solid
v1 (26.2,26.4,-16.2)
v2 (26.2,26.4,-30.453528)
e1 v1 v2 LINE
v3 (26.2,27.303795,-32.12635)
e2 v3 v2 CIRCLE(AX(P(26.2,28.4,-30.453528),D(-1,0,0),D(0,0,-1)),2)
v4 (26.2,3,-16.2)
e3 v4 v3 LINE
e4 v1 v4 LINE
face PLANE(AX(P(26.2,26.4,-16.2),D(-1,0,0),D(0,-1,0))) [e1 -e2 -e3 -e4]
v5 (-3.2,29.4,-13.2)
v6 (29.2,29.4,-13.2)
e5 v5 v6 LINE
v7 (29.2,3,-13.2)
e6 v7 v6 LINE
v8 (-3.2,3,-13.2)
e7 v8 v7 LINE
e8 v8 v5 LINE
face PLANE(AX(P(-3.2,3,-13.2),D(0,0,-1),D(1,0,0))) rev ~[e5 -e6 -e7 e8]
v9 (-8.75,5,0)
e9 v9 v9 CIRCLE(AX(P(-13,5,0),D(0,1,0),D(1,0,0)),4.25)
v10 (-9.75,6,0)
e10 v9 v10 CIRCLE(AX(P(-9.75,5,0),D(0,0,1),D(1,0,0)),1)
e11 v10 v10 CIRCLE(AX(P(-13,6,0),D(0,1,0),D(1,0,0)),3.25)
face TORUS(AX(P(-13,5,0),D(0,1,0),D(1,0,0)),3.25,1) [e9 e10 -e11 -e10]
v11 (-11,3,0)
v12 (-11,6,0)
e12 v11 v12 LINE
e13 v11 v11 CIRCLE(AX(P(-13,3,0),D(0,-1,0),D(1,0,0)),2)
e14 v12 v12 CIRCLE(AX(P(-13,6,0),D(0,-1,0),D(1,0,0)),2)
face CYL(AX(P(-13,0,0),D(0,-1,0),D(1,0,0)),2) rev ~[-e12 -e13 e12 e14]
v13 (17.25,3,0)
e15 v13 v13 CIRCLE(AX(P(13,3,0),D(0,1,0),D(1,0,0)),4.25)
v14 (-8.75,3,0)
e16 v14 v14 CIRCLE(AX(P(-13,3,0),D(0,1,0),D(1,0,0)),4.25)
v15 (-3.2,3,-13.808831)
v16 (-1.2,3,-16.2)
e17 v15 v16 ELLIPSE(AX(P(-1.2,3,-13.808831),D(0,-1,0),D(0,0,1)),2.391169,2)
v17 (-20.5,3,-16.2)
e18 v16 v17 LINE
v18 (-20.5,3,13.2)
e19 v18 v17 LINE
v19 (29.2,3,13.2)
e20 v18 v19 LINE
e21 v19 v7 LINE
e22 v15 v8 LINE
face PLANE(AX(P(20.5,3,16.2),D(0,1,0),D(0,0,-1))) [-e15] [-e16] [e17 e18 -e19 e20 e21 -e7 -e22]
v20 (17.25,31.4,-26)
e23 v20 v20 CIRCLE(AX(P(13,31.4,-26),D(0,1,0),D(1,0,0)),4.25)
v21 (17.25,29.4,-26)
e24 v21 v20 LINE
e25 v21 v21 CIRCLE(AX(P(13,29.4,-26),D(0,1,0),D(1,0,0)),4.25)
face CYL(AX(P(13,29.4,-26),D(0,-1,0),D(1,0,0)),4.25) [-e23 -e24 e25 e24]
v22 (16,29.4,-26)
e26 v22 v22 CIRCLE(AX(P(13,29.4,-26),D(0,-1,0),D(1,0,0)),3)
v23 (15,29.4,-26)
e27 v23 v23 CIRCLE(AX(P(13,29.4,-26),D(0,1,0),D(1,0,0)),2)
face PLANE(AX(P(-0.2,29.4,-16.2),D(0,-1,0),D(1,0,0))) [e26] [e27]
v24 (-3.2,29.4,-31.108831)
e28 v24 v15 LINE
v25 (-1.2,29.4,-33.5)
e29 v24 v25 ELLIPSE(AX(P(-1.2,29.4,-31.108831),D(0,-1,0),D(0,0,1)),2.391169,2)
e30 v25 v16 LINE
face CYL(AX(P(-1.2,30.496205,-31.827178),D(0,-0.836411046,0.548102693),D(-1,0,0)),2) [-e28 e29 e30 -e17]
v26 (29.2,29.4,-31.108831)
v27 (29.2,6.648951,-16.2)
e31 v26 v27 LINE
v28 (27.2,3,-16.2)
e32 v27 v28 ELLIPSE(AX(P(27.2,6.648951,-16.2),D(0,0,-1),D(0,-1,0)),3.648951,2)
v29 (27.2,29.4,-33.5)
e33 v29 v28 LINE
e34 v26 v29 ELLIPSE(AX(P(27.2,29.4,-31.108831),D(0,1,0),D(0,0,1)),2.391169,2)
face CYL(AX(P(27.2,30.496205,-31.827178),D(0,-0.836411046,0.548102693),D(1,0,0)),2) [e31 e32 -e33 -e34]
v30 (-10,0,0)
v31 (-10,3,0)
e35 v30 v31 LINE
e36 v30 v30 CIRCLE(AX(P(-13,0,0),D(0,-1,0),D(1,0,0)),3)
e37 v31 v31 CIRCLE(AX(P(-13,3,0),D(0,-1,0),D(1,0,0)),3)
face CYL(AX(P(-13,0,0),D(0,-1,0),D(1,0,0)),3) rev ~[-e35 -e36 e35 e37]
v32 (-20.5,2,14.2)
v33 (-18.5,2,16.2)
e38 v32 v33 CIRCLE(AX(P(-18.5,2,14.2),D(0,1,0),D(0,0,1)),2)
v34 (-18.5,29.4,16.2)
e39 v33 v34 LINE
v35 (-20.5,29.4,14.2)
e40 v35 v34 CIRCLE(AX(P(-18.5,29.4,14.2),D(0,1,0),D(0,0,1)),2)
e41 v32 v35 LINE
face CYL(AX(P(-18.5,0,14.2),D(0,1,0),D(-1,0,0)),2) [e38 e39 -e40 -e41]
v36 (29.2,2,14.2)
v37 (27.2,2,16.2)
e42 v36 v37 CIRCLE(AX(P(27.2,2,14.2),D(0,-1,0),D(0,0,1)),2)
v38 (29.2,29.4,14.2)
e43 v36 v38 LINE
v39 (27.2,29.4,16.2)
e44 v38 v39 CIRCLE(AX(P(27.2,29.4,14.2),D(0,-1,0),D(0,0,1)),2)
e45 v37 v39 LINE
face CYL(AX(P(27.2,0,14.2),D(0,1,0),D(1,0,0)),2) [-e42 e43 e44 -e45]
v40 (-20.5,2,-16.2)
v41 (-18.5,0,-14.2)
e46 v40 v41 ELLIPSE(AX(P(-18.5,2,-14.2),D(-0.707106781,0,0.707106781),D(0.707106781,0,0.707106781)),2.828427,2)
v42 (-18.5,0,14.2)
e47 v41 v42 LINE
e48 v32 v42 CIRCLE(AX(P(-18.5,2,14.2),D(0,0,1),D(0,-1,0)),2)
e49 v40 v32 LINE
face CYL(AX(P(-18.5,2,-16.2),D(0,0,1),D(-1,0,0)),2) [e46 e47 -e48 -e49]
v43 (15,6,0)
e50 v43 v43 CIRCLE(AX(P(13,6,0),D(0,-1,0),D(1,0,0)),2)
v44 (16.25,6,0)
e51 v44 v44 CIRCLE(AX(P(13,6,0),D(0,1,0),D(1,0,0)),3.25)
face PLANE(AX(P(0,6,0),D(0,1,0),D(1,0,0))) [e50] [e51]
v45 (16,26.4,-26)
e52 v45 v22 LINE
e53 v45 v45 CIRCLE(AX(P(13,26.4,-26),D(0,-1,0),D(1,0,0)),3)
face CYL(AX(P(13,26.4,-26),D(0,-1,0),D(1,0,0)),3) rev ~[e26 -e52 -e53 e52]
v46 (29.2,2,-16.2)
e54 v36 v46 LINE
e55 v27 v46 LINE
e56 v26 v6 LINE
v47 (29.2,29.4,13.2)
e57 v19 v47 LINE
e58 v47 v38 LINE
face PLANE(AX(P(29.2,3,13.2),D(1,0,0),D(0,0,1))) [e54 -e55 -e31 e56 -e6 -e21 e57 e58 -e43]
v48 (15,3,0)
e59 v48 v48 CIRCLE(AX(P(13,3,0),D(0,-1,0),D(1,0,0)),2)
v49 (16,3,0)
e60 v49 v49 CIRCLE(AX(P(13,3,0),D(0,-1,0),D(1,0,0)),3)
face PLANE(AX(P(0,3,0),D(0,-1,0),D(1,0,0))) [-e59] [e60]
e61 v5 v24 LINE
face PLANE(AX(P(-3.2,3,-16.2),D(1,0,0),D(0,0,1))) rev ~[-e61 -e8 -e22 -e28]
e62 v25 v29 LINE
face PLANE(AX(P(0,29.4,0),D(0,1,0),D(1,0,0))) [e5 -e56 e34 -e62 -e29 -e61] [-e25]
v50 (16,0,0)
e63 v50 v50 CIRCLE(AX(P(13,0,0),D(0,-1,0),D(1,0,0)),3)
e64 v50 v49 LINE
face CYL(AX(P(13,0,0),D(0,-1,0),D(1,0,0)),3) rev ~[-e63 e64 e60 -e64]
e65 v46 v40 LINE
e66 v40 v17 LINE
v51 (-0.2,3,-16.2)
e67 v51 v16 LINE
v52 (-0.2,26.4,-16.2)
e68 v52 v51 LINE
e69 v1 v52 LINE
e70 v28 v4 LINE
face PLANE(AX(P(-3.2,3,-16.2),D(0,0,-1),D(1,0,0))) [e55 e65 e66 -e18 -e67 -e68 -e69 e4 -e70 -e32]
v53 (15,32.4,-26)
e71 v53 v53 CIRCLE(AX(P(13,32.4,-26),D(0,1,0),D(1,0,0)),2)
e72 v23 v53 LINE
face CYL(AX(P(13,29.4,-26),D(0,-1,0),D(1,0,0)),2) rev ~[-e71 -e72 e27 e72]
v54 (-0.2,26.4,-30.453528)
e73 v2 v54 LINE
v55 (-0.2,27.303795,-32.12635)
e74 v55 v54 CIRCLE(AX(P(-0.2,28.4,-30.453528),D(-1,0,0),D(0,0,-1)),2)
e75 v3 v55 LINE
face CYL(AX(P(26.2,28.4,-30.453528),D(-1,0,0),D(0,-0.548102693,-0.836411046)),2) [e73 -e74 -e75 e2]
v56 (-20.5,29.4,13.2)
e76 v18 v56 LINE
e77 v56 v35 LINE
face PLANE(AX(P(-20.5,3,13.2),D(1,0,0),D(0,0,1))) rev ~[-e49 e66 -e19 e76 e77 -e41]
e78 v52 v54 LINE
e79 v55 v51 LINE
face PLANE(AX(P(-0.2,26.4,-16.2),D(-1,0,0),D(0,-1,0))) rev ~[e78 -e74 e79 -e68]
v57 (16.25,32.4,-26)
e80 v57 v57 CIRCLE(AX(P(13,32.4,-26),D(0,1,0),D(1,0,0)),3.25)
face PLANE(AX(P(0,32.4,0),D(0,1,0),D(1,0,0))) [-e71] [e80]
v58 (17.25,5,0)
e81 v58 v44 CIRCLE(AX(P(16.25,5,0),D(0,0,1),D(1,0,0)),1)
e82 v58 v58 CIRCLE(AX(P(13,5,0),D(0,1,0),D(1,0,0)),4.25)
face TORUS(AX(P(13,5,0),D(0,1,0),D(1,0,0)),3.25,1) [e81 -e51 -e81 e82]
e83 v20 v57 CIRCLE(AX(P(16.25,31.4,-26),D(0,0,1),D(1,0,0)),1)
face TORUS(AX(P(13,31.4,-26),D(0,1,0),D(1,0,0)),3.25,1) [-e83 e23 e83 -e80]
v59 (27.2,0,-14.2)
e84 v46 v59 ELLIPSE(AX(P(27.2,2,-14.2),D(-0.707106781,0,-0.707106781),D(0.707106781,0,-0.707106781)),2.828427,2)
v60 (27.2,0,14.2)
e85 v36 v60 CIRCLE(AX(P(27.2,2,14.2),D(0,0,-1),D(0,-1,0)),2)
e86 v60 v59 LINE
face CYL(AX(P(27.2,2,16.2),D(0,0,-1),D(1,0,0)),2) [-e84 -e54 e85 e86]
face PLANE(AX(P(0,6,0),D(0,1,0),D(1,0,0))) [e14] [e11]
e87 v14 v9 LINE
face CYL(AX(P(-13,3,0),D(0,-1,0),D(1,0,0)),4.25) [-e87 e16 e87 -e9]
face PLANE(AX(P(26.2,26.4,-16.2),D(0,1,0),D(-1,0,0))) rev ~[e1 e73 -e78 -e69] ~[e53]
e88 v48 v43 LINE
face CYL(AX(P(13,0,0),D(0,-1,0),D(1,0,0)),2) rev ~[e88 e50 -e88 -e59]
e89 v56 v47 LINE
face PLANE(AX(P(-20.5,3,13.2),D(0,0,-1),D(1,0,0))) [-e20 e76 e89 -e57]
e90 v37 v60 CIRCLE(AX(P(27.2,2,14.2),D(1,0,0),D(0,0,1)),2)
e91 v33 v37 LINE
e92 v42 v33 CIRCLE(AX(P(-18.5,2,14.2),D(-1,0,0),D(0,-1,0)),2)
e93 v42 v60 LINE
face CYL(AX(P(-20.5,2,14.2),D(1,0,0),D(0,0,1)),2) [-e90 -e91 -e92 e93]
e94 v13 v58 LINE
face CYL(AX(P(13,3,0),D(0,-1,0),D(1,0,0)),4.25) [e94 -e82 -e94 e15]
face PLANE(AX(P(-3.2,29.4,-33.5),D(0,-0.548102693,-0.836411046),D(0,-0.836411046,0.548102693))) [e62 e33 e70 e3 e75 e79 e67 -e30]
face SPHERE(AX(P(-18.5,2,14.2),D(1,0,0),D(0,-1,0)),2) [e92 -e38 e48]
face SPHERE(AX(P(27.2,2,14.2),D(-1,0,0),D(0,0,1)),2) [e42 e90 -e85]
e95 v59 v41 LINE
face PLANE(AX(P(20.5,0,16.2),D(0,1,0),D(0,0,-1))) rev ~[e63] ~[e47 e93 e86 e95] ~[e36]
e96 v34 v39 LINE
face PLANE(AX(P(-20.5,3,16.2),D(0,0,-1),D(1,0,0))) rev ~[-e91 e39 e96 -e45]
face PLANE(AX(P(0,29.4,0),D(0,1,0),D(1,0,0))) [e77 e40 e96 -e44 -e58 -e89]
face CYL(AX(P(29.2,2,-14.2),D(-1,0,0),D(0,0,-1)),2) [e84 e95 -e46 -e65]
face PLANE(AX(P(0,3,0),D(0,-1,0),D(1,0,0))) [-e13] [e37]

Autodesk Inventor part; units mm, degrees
ref_plane "YZ Plane" through (0, 0, 0) normal (1, 0, 0) x (0, 1, 0)
ref_plane "XZ Plane" through (0, 0, 0) normal (0, 1, 0) x (-1, 0, 0)
ref_plane "XY Plane" through (0, 0, 0) normal (0, 0, 1) x (1, 0, 0)
sketch "Sketch1" plane through (0, 0, 0) normal (0, 1, 0) x (-1, 0, 0)
  line L0 (20.5, 16.2) -> (-20.5, 16.2)
  line L1 (-20.5, 16.2) -> (-20.5, -16.2)
  line L2 (-20.5, -16.2) -> (20.5, -16.2)
  line L3 (20.5, -16.2) -> (20.5, 16.2)
  point P0 (0, 0)
  dimension "d0" = 41
  dimension "d1" = 32.4
extrude "Extrusion1" add sketch "Sketch1" along normal blind 3
sketch "Sketch4" plane through (20.5, 0, -16.2) normal (0, 0, -1) x (-1, 0, 0)
  line L0 (41, 3) -> (0, 3) projected
  line L1 (0, 28.4) -> (41, 28.4) projected
  line L2 (0, 3) -> (21.5, 3)
  line L3 (21.5, 3) -> (21.5, 28.4)
  line L4 (21.5, 28.4) -> (0, 28.4)
  line L5 (0, 28.4) -> (0, 3)
  point P0 (20.5, 0)
  dimension "d12" = 21.5
extrude "Extrusion4" cut sketch "Sketch4" against normal blind 3
sketch "Sketch5" plane through (-20.5, 0, 16.2) normal (0, 0, 1) x (1, 0, 0)
  line L0 (41, 28.4) -> (0, 28.4) projected
  line L1 (41, 3) -> (0, 3) projected
  line L2 (0, 28.4) -> (21.5, 28.4)
  line L3 (21.5, 28.4) -> (21.5, 3)
  line L4 (21.5, 3) -> (0, 3)
  line L5 (0, 3) -> (0, 28.4)
  point P0 (20.5, 0)
  point P1 (19.5, 3)
  point P2 (19.5, 3)
  dimension "d15" = 21.5
extrude "Extrusion5" cut sketch "Sketch5" against normal blind 3
sketch "Sketch6" plane through (0, 3, 0) normal (0, 1, 0) x (1, 0, 0)
  circle A0 centre (13, 0) radius 4.25
  circle A1 centre (-13, 0) radius 4.25
  point P0 (0, 0)
  dimension "d20" = 8.5
  dimension "d21" = 8.5
extrude "Extrusion6" add sketch "Sketch6" along normal blind 3
sketch "Sketch7" plane through (0, 0, 0) normal (0, -1, 0) x (1, 0, 0)
  circle A0 centre (-13, 0) radius 4.25 projected
  circle A1 centre (-13, 0) radius 2
  circle A2 centre (13, 0) radius 4.25 projected
  circle A3 centre (13, 0) radius 2
  point P0 (0, 0)
  dimension "d24" = 4
  dimension "d25" = 4
extrude "Extrusion7" cut sketch "Sketch7" against normal blind 6 contours A1 | A3
sketch "Sketch8" plane through (0, 0, 0) normal (0, -1, 0) x (1, 0, 0)
  circle A0 centre (-13, 0) radius 2 projected
  circle A1 centre (-13, 0) radius 3
  circle A2 centre (13, 0) radius 2 projected
  circle A3 centre (13, 0) radius 3
  point P0 (0, 0)
  dimension "d28" = 6
  dimension "d29" = 6
extrude "Extrusion8" cut sketch "Sketch8" against normal blind 3 contours A0 | A1 | A2 | A3
sketch "Sketch15" plane through (20.5, 0, 16.2) normal (1, 0, 0) x (0, 0, -1)
  line L0 (0, 3) -> (32.4, 3) projected
  line L1 (0, 0) -> (32.4, 0)
  line L2 (32.4, 0) -> (32.4, 3)
  line L3 (32.4, 3) -> (0, 3)
  line L4 (0, 3) -> (0, 0)
  point P0 (16.2, 0)
extrude "Extrusion15" add sketch "Sketch15" along normal blind 8.7
sketch "Sketch23" plane through (0, 3, 0) normal (0, 1, 0) x (1, 0, 0)
  line L0 (-20.5, 16.2) -> (29.2, 16.2) projected
  line L1 (29.2, 16.2) -> (-3.2, 16.2)
  line L2 (-3.2, 16.2) -> (-3.2, 13.2)
  line L3 (-3.2, 13.2) -> (29.2, 13.2)
  line L4 (29.2, 13.2) -> (29.2, 16.2)
  point P0 (0, 0)
  dimension "d81" = 32.4
  dimension "d82" = 3
extrude "Extrusion23" add sketch "Sketch23" along normal blind 26.4
sketch "Sketch24" plane through (-20.5, 0, -16.2) normal (0, 0, -1) x (-1, 0, 0)
  line L0 (-17.3, 3) -> (-17.3, 29.4) projected
  line L1 (-49.7, 3) -> (-17.3, 3) projected
  line L2 (-17.3, 29.4) -> (-20.3, 29.4)
  line L3 (-20.3, 29.4) -> (-20.3, 3)
  line L4 (-20.3, 3) -> (-17.3, 3)
  line L5 (-17.3, 3) -> (-17.3, 29.4)
  line L6 (-49.7, 0) -> (-49.7, 29.4) projected
  line L7 (-49.7, 29.4) -> (-46.7, 29.4)
  line L8 (-46.7, 29.4) -> (-46.7, 3)
  line L9 (-46.7, 3) -> (-49.7, 3)
  line L10 (-49.7, 3) -> (-49.7, 29.4)
  line L11 (-20.3, 29.4) -> (-46.7, 29.4)
  line L12 (-46.7, 29.4) -> (-46.7, 26.4)
  line L13 (-46.7, 26.4) -> (-20.3, 26.4)
  line L14 (-20.3, 26.4) -> (-20.3, 29.4)
  point P0 (-20.5, 0)
  dimension "d85" = 3
  dimension "d86" = 3
  dimension "d87" = 3
extrude "Extrusion24" add sketch "Sketch24" along normal blind 17.3 contours L1 L3 L2 L0 | L3 L13 L8 L11 | L1 L6 L7 L8
sketch "Sketch25" plane through (-3.2, 3, -13.2) normal (-1, 0, 0) x (0, 0, 1)
  line L0 (0, 26.4) -> (-20.3, 26.4) projected
  line L1 (0, 0) -> (-3, 0) projected
  line L2 (-20.3, 26.4) -> (-3, 0)
  line L3 (-20.3, 26.4) -> (-20.3, 0) projected
  line L4 (-3, 0) -> (-20.3, 0)
  line L5 (-20.3, 0) -> (-20.3, 26.4)
  point P0 (13.2, -3)
extrude "Extrusion25" cut sketch "Sketch25" against normal blind 32.4
sketch "Sketch26" plane through (0, 29.4, 0) normal (0, 1, 0) x (1, 0, 0)
  circle A0 centre (13, 26) radius 2
  point P0 (0, 0)
  dimension "d92" = 4
extrude "Extrusion26" cut sketch "Sketch26" against normal blind 32.4
sketch "Sketch27" plane through (0, 29.4, 0) normal (0, 1, 0) x (1, 0, 0)
  circle A0 centre (13, 26) radius 2 projected
  circle A1 centre (13, 26) radius 4.25
  point P0 (0, 0)
  dimension "d95" = 8.5
extrude "Extrusion27" add sketch "Sketch27" along normal blind 3
sketch "Sketch28" plane through (0, 3, 0) normal (0, 1, 0) x (1, 0, 0)
  line L0 (-20.5, -16.2) -> (29.2, -16.2) projected
  line L1 (-20.5, 16.2) -> (-20.5, -16.2) projected
  line L2 (29.2, -16.2) -> (-20.5, -16.2)
  line L3 (-20.5, -16.2) -> (-20.5, -13.2)
  line L4 (-20.5, -13.2) -> (29.2, -13.2)
  line L5 (29.2, -13.2) -> (29.2, -16.2)
  point P0 (0, 0)
  dimension "d98" = 3
extrude "Extrusion28" add sketch "Sketch28" along normal blind 26.4
fillet "Fillet3" radius 1 3 edges at (8.75, 32.4, -26) (-17.25, 6, 0) (8.75, 6, 0)
fillet "Fillet4" radius 2 9 edges at (4.35, 0, 16.2) (-20.5, 0, 0) (29.2, 14.7, 16.2) (29.2, 0, 0) (29.2, 16.2, -24.85) (-3.2, 16.2, -24.85) (4.35, 0, -16.2) (13, 26.4, -31.5341) (-20.5, 14.7, 16.2)
sketch "Sketch29" plane through (-0.2, 26.4, -16.2) normal (0, -1, 0) x (1, 0, 0)
  circle A0 centre (13.2, -9.8) radius 2 projected
  circle A1 centre (13.2, -9.8) radius 3
  point P0 (0.2, 16.2)
  dimension "d103" = 6
extrude "Extrusion29" cut sketch "Sketch29" against normal blind 3
properties part number "cornerMount_PBF"
